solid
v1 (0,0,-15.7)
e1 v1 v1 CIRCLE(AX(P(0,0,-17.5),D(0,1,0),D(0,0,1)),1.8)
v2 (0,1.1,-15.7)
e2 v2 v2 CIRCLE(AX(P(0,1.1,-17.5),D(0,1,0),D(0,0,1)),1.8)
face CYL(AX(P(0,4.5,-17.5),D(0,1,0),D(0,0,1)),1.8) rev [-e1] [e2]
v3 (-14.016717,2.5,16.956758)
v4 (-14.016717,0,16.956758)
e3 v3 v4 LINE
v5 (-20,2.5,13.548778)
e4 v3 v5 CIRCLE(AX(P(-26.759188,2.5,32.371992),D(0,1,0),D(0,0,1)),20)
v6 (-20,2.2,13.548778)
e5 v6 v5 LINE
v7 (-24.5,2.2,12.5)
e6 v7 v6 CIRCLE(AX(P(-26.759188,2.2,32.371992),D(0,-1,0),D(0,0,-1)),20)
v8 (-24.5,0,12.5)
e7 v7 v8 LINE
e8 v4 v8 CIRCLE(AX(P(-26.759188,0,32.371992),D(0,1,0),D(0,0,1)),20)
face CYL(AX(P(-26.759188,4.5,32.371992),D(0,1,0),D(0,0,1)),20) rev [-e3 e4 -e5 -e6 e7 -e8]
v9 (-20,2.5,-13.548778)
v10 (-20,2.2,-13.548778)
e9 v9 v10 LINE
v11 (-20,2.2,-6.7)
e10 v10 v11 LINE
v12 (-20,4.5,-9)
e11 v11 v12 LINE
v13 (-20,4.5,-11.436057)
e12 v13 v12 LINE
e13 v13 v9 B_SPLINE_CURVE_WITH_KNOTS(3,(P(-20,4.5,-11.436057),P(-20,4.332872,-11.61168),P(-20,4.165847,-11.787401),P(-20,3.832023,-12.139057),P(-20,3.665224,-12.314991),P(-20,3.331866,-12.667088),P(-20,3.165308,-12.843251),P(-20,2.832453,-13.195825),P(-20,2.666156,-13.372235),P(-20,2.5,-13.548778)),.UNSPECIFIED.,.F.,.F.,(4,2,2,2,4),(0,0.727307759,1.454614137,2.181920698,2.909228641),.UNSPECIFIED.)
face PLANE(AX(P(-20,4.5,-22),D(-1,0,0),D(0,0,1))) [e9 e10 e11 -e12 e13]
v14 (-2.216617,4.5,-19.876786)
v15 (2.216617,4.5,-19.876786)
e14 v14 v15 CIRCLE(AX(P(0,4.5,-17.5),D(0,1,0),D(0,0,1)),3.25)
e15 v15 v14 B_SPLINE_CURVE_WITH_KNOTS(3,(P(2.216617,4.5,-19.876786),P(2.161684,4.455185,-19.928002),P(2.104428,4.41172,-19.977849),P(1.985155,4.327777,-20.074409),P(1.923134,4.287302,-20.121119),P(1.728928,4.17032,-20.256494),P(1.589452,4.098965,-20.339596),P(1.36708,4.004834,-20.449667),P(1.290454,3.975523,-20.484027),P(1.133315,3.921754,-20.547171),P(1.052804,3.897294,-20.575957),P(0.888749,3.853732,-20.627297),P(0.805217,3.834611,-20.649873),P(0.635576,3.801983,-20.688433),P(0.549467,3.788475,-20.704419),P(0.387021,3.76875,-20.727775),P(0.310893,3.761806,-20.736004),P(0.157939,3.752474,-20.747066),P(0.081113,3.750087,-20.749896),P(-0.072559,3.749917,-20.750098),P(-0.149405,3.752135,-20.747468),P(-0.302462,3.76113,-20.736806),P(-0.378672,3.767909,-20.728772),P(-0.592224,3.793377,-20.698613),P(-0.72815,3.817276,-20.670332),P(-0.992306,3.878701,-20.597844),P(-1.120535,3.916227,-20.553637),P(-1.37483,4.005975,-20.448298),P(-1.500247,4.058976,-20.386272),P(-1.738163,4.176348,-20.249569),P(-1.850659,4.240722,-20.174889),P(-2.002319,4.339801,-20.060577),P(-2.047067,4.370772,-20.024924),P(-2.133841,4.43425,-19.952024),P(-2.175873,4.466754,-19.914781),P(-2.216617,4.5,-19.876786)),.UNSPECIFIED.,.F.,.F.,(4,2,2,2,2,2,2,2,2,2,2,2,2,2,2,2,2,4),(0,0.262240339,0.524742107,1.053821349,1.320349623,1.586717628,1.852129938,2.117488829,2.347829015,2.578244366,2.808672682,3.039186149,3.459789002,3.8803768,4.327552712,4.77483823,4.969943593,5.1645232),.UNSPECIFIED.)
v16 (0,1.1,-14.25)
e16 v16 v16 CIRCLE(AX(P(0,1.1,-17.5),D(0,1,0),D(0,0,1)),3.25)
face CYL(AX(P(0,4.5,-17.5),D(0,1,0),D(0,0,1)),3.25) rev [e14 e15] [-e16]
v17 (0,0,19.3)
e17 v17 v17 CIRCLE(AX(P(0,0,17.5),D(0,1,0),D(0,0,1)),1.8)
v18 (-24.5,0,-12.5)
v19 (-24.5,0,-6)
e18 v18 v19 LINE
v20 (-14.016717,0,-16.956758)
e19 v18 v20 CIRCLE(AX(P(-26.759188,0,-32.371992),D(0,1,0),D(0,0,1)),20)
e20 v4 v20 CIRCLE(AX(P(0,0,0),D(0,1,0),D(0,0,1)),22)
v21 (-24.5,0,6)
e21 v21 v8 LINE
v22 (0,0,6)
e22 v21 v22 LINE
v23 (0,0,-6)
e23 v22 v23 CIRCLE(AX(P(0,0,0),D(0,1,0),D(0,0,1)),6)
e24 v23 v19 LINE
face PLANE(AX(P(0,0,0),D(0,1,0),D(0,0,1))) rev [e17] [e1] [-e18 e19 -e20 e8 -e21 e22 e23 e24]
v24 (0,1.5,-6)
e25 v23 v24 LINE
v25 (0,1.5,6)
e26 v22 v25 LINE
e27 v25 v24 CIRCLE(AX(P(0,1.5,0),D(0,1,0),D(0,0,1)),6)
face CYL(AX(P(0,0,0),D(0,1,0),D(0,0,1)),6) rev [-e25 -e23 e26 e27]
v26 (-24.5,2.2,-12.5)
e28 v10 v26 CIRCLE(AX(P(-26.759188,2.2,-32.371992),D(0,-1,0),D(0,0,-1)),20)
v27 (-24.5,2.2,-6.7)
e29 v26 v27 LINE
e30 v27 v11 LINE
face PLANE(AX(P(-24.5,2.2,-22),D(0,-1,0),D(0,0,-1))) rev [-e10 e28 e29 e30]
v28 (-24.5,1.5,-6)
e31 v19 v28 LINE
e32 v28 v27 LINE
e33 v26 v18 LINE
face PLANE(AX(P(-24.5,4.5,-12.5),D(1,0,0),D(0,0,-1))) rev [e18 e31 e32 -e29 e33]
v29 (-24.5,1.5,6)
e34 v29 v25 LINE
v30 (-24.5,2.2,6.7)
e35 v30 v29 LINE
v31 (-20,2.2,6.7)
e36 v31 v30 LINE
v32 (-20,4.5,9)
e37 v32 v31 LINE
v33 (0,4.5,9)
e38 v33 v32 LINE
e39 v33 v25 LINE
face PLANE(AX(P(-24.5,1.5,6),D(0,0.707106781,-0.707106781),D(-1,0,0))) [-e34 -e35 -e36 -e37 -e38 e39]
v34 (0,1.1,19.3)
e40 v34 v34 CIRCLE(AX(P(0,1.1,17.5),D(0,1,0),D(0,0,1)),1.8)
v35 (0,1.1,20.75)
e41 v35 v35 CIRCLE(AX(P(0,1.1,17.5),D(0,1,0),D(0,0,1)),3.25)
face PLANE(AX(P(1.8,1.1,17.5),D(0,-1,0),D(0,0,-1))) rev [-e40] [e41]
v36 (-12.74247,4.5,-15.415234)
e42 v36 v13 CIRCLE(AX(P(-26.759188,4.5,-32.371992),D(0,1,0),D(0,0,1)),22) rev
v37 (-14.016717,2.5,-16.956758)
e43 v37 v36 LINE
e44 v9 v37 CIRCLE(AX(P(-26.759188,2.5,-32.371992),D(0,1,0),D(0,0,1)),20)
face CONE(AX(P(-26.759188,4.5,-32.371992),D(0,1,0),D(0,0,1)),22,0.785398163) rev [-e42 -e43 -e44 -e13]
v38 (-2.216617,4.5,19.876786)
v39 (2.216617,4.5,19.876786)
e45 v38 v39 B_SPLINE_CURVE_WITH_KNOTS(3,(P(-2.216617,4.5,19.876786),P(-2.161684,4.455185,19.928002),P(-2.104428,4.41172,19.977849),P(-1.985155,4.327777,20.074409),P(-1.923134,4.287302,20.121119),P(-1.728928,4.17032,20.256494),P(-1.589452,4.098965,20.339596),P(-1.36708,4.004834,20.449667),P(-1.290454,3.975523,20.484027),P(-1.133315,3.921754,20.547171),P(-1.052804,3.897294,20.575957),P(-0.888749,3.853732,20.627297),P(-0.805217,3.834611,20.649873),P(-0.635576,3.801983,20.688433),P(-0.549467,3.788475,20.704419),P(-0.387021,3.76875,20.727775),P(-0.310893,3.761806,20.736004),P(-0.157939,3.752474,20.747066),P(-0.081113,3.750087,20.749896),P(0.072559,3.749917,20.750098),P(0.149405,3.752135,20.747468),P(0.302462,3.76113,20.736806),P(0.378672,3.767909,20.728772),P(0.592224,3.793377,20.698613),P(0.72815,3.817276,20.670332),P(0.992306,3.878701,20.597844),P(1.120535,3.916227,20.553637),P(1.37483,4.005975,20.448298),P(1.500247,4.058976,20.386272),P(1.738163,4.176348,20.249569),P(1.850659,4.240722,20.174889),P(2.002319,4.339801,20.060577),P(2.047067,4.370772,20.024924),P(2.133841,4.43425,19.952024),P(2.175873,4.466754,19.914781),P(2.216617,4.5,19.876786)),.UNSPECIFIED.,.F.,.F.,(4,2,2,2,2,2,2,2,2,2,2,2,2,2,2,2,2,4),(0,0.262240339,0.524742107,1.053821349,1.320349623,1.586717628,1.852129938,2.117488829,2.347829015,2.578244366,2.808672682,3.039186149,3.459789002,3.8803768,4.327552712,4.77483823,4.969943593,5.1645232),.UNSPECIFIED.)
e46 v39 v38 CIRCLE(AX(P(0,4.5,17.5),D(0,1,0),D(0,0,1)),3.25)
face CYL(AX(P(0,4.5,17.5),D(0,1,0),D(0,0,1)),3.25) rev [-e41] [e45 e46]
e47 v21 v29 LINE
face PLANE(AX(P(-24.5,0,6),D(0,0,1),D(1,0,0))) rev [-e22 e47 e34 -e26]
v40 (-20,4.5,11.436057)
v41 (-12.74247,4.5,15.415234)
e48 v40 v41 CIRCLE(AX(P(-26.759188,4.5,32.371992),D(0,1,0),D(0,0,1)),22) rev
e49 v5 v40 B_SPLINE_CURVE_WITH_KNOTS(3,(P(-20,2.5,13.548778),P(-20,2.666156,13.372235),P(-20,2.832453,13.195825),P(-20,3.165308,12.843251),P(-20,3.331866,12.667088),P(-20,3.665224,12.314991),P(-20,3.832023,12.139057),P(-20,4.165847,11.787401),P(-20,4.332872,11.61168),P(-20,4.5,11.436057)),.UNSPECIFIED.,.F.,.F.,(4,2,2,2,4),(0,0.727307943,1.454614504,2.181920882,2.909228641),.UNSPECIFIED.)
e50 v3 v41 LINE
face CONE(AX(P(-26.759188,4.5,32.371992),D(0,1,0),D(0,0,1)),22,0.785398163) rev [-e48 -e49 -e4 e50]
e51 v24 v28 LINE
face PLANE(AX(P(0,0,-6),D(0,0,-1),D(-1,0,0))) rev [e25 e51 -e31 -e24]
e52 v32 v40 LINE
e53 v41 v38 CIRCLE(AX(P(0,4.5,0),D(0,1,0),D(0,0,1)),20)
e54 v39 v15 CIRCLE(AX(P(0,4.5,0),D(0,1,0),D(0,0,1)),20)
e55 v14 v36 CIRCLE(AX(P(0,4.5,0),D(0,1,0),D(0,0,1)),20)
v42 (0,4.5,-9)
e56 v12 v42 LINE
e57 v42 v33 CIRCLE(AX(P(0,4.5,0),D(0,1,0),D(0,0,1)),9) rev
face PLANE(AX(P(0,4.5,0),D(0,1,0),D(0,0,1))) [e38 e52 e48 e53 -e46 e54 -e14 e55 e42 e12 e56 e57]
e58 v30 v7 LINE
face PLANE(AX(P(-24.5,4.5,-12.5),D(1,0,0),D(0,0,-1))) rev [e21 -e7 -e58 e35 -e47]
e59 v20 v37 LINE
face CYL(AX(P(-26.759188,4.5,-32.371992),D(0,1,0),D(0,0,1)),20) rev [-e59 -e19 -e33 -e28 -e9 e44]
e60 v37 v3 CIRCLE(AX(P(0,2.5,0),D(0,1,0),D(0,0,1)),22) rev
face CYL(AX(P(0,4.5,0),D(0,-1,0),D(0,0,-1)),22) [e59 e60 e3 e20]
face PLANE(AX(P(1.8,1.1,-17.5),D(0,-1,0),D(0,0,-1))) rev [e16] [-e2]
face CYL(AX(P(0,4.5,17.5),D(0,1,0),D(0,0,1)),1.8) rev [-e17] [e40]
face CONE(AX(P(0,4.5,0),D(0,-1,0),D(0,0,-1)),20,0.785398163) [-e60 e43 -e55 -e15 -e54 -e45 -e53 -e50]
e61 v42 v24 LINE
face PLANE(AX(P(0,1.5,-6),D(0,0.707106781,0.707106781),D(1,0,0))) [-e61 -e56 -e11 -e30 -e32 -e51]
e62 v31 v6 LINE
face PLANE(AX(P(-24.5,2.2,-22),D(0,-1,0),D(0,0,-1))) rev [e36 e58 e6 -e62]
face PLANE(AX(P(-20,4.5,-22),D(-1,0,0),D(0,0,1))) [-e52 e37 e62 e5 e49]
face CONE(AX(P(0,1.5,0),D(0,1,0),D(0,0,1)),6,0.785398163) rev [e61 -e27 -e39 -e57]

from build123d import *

# Parameters (mm, degrees)
BOSS_EXTRUDE1_DEPTH                                 = 4.5
CUT_EXTRUDE1_DEPTH                                  = 43.552908244
CUT_EXTRUDE1_DEPTH_BACK                             = 43.552908244
SKETCH2_W                                           = 4.5
SKETCH2_H                                           = 2.3
CUT_EXTRUDE2_DEPTH                                  = 34.234018716
CUT_EXTRUDE2_DEPTH_BACK                             = 34.234018716
CBORE_FOR_M3_HEX_SOCKET_HEAD_CAP_SCREW1_D           = 3.6
CBORE_FOR_M3_HEX_SOCKET_HEAD_CAP_SCREW1_CBORE_D     = 6.5
CBORE_FOR_M3_HEX_SOCKET_HEAD_CAP_SCREW1_CBORE_DEPTH = 3.4
FILLET2_DEPTH                                       = 4.5
FILLET2_2_DEPTH                                     = 2.2
CHAMFER1_SIZE                                       = 3
CHAMFER2_SIZE                                       = 2


with BuildPart() as part:
    # Sketch1 → Boss-Extrude1 (new body)
    with BuildSketch(Plane(origin=(0, 0, 0), x_dir=(1, 0, 0), z_dir=(0, 1, 0))):
        with BuildLine():
            Line((-18.10386699, 12.5), (-24.5, 12.5))
            Line((-24.5, 12.5), (-24.5, -12.5))
            Line((-24.5, -12.5), (-18.10386699, -12.5))
            ThreePointArc((-18.10386699, -12.5), (22, 0), (-18.10386699, 12.5))
        make_face()
    extrude(amount=BOSS_EXTRUDE1_DEPTH)

    # Sketch2 → Cut-Extrude1 (cut, two sides: drawn at the far end of the back side and taken through both)
    with BuildSketch(Plane.XY.offset(12.5).offset(-CUT_EXTRUDE1_DEPTH_BACK)):
        with Locations((-22.25, 3.35)):
            Rectangle(SKETCH2_W, SKETCH2_H)
    extrude(amount=CUT_EXTRUDE1_DEPTH + CUT_EXTRUDE1_DEPTH_BACK, mode=Mode.SUBTRACT)

    # Sketch3 → Cut-Extrude2 (cut, two sides: drawn at the far end of the back side and taken through both)
    with BuildSketch(Plane(origin=(0, 4.5, 0), x_dir=(1, 0, 0), z_dir=(0, 1, 0)).offset(-CUT_EXTRUDE2_DEPTH_BACK)):
        with BuildLine():
            Line((0, 6), (-24.5, 6))
            Line((-24.5, 6), (-24.5, -6))
            Line((-24.5, -6), (0, -6))
            ThreePointArc((0, -6), (6, 0), (0, 6))
        make_face()
    extrude(amount=CUT_EXTRUDE2_DEPTH + CUT_EXTRUDE2_DEPTH_BACK, mode=Mode.SUBTRACT)

    # CBORE for M3 Hex Socket Head Cap Screw1 (through all)
    with Locations(Plane(origin=(0, 4.5, 0), x_dir=(1, 0, 0), z_dir=(0, 1, 0))):
        with Locations((0, -17.5), (0, 17.5)):
            CounterBoreHole(CBORE_FOR_M3_HEX_SOCKET_HEAD_CAP_SCREW1_D / 2, CBORE_FOR_M3_HEX_SOCKET_HEAD_CAP_SCREW1_CBORE_D / 2, CBORE_FOR_M3_HEX_SOCKET_HEAD_CAP_SCREW1_CBORE_DEPTH)

    # Fillet2: read off the stored shape, not the designer's step
    # Fillet2 outline → Fillet2 (add)
    with BuildSketch(Plane(origin=(0, 0, 0), x_dir=(1, 0, 0), z_dir=(0, 1, 0))):
        with BuildLine():
            Line((-18.10386699, -12.5), (-20, -12.5))
            Line((-20, -12.5), (-20, -13.548778219))
            ThreePointArc((-20, -13.548778219), (-16.860589429, -14.993334166), (-14.016717362, -16.956757779))
            ThreePointArc((-14.016717362, -16.956757779), (-16.214149909, -14.869476882), (-18.10386699, -12.5))
        make_face()
        with BuildLine():
            ThreePointArc((-18.10386699, 12.5), (-16.214149909, 14.869476882), (-14.016717362, 16.956757779))
            ThreePointArc((-14.016717362, 16.956757779), (-16.860589429, 14.993334166), (-20, 13.548778219))
            Line((-20, 13.548778219), (-20, 12.5))
            Line((-20, 12.5), (-18.10386699, 12.5))
        make_face()
    extrude(amount=FILLET2_DEPTH)

    # Fillet2 2 outline → Fillet2 2 (add)
    with BuildSketch(Plane(origin=(0, 0, 0), x_dir=(1, 0, 0), z_dir=(0, 1, 0))):
        with BuildLine():
            Line((-20, -13.548778219), (-20, -12.5))
            Line((-20, -12.5), (-24.5, -12.5))
            ThreePointArc((-24.5, -12.5), (-22.219610886, -12.893998326), (-20, -13.548778219))
        make_face()
        with BuildLine():
            Line((-20, 12.5), (-20, 13.548778219))
            ThreePointArc((-20, 13.548778219), (-22.219610886, 12.893998326), (-24.5, 12.5))
            Line((-24.5, 12.5), (-20, 12.5))
        make_face()
    extrude(amount=FILLET2_2_DEPTH)

    # Chamfer1
    chamfer1_edges = [part.edges().sort_by_distance(p)[0] for p in [
        (-10, 4.5, 6),
        (-10, 4.5, -6),
        (6, 4.5, 0),
    ]]
    chamfer(chamfer1_edges, length=CHAMFER1_SIZE)

    # Chamfer2
    # the kernel refuses this chamfer: 2 mm, written as the material it takes off along each edge
    with BuildSketch(Plane(origin=(0, 4.5, 0), x_dir=(-0.6371235164664789, 0, 0.7707617172417092), z_dir=(-0.7707617172417092, 0, -0.6371235164664789))) as chamfer2_piece_1:
        Polygon((22 - CHAMFER2_SIZE, 0), (22, -CHAMFER2_SIZE), (22, 0), align=None)
    revolve(axis=Axis((0, 4.5, 0), (0, 1, 0)), revolution_arc=259.155320495, mode=Mode.SUBTRACT)
    with BuildSketch(Plane(origin=(-26.75918769, 4.5, -32.371992129), x_dir=(0.6371235163113105, 0, 0.7707617173699738), z_dir=(0.7707617173699738, 0, -0.6371235163113105))) as chamfer2_piece_2:
        Polygon((20.000000004, CHAMFER2_SIZE), (20.000000004 + CHAMFER2_SIZE, 0), (20.000000004, 0), align=None)
    revolve(axis=Axis((-26.75918769, 4.5, -32.371992129), (0, -1, 0)), revolution_arc=34.56000809, mode=Mode.SUBTRACT)
    with BuildSketch(Plane(origin=(-26.75918769, 4.5, 32.371992129), x_dir=(0.08746265429711, 0, -0.9961677991700516), z_dir=(-0.9961677991700516, 0, -0.08746265429711))) as chamfer2_piece_3:
        Polygon((20.000000004 + CHAMFER2_SIZE, 0), (20.000000004, CHAMFER2_SIZE), (20.000000004, 0), align=None)
    revolve(axis=Axis((-26.75918769, 4.5, 32.371992129), (0, -1, 0)), revolution_arc=34.56000809, mode=Mode.SUBTRACT)


solid = part.part
